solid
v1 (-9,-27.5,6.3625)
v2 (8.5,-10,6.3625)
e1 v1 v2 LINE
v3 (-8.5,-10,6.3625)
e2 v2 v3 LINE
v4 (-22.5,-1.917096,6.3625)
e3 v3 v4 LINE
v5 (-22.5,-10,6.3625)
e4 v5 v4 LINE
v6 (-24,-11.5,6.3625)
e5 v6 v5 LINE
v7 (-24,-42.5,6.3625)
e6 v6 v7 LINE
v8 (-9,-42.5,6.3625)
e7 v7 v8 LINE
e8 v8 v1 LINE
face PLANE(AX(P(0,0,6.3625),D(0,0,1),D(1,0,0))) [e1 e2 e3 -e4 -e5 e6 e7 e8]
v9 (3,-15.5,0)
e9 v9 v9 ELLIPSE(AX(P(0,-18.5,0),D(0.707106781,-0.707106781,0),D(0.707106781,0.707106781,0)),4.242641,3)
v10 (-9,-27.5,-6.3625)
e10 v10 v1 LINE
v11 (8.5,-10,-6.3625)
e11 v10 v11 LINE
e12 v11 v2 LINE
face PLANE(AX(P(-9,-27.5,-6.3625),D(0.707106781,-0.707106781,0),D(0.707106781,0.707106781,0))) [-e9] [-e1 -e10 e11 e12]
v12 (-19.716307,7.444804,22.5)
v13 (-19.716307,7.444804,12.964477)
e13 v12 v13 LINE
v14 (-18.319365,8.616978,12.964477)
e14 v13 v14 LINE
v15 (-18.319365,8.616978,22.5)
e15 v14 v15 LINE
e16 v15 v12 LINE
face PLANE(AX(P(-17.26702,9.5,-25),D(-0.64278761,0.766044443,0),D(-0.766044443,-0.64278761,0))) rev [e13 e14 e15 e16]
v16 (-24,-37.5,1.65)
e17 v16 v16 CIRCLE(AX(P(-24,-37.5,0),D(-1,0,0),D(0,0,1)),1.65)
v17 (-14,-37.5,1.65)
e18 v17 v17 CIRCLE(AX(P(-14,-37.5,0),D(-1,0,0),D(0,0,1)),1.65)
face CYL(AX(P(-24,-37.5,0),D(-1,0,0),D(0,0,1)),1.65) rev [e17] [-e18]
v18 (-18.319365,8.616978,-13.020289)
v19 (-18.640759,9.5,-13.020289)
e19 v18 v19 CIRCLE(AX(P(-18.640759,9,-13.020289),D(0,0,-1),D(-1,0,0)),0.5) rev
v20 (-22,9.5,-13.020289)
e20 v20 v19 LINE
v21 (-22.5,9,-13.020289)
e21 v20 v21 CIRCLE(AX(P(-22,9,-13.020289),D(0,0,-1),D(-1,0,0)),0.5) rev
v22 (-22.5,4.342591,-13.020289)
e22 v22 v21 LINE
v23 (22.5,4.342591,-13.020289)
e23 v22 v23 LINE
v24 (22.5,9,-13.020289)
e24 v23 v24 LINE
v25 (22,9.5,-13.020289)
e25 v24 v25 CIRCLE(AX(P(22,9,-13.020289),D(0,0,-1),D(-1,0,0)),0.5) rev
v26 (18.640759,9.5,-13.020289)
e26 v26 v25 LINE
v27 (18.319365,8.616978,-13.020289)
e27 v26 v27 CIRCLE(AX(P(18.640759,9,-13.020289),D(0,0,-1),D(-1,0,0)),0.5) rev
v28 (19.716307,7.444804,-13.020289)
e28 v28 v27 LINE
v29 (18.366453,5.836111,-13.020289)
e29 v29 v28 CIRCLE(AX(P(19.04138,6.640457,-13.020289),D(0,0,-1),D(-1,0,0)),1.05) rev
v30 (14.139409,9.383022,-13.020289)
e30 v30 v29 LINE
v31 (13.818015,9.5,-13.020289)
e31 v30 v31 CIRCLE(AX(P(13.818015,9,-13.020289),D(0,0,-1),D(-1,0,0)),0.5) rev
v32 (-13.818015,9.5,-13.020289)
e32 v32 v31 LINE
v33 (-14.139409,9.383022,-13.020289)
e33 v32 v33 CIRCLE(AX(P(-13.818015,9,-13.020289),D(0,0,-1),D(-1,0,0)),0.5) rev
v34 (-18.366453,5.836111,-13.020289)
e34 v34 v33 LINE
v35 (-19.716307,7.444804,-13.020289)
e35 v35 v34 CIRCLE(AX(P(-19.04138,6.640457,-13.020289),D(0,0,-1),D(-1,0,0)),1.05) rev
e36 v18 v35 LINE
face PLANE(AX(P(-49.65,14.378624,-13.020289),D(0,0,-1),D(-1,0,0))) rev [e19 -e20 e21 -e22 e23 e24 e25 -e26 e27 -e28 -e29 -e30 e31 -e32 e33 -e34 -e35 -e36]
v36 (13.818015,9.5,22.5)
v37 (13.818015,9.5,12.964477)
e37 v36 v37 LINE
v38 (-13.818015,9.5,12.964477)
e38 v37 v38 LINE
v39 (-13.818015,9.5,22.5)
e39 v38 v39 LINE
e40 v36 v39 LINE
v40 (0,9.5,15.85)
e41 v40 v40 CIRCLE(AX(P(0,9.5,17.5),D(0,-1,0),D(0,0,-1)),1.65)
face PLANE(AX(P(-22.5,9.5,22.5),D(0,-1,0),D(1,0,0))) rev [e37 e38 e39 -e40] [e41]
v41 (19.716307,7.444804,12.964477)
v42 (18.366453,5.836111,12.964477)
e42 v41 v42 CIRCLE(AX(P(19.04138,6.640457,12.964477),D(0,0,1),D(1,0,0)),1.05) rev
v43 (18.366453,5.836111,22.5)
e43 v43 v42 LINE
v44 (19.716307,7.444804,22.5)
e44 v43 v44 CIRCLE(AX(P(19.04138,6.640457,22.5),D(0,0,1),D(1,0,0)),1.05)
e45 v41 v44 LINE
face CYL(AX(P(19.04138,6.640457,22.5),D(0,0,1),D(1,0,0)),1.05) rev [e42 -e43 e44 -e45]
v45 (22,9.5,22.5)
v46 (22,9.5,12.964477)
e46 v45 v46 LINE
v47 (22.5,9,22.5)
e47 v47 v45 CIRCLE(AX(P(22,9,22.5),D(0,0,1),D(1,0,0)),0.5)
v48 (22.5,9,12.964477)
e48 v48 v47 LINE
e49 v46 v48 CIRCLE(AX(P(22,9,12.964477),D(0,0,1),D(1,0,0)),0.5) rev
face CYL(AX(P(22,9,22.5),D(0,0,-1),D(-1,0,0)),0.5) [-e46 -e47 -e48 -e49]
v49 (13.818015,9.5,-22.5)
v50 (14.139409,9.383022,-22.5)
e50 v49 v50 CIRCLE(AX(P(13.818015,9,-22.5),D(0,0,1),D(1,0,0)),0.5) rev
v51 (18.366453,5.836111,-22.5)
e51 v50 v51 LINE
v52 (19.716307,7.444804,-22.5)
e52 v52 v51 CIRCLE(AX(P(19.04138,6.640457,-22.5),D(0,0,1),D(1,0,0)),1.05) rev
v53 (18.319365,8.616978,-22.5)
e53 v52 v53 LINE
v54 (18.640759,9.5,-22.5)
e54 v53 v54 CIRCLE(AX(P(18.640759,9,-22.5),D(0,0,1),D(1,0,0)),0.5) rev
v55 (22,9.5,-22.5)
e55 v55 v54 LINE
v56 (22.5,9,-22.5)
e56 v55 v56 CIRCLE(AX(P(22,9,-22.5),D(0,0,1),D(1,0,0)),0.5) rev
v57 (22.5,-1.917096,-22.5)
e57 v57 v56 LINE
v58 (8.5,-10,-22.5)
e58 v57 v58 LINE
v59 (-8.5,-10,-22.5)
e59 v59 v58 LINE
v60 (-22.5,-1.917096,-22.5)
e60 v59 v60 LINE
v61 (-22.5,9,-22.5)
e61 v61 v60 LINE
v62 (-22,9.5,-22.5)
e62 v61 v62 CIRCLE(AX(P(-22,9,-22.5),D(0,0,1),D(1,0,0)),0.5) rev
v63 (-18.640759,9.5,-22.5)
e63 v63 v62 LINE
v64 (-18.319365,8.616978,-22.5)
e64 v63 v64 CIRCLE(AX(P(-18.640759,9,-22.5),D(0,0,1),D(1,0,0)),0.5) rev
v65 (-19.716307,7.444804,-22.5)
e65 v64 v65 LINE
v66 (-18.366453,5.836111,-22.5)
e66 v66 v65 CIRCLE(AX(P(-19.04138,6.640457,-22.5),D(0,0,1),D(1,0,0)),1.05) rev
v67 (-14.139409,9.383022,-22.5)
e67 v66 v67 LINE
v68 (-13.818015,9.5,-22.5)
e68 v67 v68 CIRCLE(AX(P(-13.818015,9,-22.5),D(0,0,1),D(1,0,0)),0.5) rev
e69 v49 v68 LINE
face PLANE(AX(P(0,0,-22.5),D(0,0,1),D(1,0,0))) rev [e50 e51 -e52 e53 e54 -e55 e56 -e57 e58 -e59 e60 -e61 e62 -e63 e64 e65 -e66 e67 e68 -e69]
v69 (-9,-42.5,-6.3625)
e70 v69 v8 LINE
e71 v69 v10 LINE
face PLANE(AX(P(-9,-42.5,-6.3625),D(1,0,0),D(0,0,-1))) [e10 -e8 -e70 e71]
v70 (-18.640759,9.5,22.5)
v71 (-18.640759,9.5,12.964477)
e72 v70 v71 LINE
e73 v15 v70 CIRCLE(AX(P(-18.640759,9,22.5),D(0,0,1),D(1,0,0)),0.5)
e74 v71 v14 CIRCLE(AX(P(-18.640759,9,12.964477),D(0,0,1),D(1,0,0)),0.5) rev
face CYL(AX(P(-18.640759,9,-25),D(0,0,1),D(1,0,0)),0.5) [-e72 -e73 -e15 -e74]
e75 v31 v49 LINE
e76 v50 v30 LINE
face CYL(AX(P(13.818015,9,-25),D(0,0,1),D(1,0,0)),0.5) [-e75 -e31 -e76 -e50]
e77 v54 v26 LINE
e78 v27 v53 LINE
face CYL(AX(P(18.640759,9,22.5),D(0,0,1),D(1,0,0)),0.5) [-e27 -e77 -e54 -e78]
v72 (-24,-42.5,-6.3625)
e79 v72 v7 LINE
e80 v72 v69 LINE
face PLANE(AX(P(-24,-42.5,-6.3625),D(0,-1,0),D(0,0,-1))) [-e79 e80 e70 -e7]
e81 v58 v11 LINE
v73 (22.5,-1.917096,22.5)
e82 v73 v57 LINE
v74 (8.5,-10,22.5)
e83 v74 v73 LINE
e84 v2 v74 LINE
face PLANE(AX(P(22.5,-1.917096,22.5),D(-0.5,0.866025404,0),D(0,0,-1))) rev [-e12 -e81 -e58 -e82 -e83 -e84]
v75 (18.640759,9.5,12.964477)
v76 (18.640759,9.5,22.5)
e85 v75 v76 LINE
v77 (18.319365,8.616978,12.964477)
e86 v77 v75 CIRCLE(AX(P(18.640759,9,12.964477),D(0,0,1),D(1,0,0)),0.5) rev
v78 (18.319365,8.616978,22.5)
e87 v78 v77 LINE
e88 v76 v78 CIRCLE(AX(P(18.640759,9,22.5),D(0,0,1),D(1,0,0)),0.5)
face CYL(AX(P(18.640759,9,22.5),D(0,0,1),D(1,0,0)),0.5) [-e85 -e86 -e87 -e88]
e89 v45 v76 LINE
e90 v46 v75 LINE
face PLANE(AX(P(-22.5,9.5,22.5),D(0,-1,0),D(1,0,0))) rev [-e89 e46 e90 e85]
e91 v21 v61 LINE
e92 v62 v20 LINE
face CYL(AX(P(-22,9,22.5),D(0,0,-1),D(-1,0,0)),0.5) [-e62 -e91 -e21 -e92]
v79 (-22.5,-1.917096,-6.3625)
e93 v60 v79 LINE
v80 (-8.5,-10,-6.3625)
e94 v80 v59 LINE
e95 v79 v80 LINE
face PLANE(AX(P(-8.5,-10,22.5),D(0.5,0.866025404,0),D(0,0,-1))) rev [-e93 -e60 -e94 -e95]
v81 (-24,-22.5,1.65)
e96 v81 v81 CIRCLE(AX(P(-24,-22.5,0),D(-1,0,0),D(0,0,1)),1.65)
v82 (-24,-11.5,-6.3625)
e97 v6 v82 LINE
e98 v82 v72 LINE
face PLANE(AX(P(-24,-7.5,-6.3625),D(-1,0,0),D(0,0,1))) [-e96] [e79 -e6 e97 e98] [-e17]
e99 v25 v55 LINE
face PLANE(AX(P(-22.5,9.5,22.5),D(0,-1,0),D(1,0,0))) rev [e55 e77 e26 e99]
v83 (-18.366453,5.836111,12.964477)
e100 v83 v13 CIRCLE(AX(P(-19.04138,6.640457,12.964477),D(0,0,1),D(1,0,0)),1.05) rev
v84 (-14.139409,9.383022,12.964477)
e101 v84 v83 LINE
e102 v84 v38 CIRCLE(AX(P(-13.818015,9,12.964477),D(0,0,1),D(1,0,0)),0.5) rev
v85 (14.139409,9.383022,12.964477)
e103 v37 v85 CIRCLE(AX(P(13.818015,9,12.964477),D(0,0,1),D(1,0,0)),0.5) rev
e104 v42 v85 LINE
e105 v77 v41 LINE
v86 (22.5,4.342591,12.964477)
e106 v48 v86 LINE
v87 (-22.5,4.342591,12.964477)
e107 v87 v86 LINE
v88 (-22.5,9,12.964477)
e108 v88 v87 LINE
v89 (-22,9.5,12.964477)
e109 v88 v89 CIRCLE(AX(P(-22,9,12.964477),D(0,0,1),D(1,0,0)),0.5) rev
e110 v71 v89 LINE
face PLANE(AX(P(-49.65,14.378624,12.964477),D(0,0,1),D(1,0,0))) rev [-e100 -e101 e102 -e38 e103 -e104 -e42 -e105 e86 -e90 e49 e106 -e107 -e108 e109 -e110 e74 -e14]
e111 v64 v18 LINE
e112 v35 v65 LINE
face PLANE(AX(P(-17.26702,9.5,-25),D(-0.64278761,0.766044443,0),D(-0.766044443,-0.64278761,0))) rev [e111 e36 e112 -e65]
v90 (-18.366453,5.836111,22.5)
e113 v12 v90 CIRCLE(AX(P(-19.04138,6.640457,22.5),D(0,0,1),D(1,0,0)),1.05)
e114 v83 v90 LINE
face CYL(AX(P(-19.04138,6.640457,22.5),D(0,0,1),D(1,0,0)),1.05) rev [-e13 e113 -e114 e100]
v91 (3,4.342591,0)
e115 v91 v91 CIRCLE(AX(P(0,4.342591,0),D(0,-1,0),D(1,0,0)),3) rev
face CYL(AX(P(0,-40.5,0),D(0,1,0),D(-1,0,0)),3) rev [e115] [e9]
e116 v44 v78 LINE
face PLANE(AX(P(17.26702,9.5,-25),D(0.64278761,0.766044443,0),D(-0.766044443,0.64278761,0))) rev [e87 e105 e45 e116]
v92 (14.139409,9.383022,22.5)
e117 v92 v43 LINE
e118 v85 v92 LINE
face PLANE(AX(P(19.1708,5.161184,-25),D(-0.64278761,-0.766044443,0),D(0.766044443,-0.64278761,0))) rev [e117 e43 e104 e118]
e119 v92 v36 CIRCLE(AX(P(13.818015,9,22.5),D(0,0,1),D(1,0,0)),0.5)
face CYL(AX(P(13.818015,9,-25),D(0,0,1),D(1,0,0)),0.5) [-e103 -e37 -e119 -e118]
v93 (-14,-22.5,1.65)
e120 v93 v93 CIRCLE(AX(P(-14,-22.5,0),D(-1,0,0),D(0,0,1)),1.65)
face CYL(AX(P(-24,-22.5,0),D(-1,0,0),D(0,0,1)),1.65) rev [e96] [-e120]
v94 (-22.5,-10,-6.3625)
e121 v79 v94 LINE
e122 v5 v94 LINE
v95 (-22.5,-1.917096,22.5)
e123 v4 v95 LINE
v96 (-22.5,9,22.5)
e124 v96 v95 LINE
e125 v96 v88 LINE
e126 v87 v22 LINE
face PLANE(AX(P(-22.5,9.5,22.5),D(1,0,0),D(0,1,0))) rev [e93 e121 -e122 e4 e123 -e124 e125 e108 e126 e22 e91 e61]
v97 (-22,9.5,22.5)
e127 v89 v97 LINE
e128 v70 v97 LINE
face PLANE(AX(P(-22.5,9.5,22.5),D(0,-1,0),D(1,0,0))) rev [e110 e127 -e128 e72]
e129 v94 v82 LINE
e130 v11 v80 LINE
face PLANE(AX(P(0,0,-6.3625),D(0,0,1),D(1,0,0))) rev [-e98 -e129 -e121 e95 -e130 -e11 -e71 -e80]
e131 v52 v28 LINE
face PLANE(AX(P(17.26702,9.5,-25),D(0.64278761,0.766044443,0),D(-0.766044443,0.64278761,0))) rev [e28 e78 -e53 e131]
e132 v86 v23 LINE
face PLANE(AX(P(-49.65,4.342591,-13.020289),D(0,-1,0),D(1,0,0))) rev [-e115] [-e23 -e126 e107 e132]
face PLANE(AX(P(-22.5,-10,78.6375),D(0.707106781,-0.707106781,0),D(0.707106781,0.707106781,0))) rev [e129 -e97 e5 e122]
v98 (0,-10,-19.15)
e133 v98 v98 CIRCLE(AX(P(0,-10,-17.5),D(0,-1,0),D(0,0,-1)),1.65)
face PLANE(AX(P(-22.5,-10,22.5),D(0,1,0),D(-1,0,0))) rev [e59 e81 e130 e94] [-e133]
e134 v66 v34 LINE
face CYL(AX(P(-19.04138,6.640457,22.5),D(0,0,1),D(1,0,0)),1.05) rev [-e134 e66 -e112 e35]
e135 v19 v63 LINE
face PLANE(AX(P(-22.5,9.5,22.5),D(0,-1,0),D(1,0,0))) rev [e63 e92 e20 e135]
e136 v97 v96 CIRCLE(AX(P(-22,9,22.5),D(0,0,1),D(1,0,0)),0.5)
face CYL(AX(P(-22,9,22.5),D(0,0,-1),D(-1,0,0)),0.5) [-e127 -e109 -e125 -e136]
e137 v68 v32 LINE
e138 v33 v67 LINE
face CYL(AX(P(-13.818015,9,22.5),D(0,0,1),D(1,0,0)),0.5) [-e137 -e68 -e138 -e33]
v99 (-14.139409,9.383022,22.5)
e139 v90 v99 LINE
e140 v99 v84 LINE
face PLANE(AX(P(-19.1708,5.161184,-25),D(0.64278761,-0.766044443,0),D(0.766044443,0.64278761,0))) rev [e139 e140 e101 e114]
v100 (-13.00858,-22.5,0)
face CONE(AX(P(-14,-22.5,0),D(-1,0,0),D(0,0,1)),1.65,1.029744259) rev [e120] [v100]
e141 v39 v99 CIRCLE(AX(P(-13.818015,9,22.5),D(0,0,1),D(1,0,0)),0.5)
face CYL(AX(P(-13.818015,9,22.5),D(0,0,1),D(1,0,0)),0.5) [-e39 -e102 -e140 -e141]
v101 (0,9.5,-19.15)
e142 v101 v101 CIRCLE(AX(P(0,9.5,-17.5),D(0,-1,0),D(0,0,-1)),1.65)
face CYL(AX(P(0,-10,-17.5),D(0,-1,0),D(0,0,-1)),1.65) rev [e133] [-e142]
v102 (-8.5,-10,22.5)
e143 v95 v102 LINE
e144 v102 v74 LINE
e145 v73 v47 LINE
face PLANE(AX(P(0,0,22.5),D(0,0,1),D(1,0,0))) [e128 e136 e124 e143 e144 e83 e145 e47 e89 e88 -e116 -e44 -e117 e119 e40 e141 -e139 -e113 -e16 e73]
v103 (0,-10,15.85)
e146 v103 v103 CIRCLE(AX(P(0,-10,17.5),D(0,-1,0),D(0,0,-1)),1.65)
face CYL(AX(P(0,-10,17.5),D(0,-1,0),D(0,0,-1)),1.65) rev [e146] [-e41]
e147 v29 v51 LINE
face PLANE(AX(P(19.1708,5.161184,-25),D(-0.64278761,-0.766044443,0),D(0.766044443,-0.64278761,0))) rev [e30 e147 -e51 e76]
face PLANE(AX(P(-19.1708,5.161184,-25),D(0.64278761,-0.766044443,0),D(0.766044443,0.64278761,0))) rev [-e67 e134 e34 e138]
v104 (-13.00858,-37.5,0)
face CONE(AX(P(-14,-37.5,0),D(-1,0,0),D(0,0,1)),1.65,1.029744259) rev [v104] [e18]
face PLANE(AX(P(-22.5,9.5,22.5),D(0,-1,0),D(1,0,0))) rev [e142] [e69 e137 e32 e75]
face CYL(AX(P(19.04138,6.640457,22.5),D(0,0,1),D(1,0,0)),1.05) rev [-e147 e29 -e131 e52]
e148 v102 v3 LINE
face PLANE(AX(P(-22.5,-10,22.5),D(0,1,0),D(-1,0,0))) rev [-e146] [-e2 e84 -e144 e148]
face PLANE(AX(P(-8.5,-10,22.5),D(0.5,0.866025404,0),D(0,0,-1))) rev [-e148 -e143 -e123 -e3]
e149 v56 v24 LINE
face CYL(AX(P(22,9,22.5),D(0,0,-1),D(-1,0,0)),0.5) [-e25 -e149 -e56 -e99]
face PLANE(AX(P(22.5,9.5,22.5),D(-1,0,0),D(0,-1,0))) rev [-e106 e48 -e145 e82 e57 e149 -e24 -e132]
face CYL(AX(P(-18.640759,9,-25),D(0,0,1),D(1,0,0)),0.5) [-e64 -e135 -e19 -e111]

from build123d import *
from OCP.BRepFilletAPI import BRepFilletAPI_MakeChamfer

# Parameters (mm, degrees)
SKETCH1_W                 = 45
SKETCH1_H                 = 19.5
BOSS_EXTRUDE1_DEPTH       = 22.5
M4X0_7_TAPPED_HOLE2_D     = 3.3
BOSS_EXTRUDE3_DEPTH       = 6.3625
M4X0_7_TAPPED_HOLE1_D     = 3.3
M4X0_7_TAPPED_HOLE1_DEPTH = 10
M4X0_7_TAPPED_HOLE1_TIP   = 0.991420021
CUT_EXTRUDE2_DEPTH        = 85
SKETCH2_R                 = 3
CUT_EXTRUDE1_DEPTH        = 50
CUT_EXTRUDE3_DEPTH        = 25
FILLET1_R                 = 1.05
FILLET2_R                 = 1.05
FILLET3_R                 = 0.5
SKETCH12_W                = 25.984765903
SKETCH12_H                = 10.03603234
CUT_EXTRUDE4_DEPTH        = 72.15
CHAMFER1_SIZE             = 14
CHAMFER1_SIZE_2           = 8.082903769


with BuildPart() as part:
    # Sketch1 → Boss-Extrude1 (new, symmetric)
    with BuildSketch(Plane.XY):
        with Locations((0, -0.25)):
            Rectangle(SKETCH1_W, SKETCH1_H)
    extrude(amount=BOSS_EXTRUDE1_DEPTH, both=True)

    # M4x0.7 Tapped Hole2 (through all)
    with Locations(Plane(origin=(0, -10, 0), x_dir=(-1, 0, 0), z_dir=(0, -1, 0))):
        with Locations((0, -17.5), (0, 17.5)):
            Hole(M4X0_7_TAPPED_HOLE2_D / 2)

    # Sketch7 → Boss-Extrude3 (add, symmetric)
    with BuildSketch(Plane.XY):
        Polygon((-22.5, -7.5), (-24, -7.5), (-24, -42.5), (-9, -42.5), (-9, -27.5), (8.5, -10), (-22.5, -10), align=None)
    extrude(amount=BOSS_EXTRUDE3_DEPTH, both=True)

    # M4x0.7 Tapped Hole1
    with Locations(Plane(origin=(-24, 0, 0), x_dir=(0, 0, -1), z_dir=(-1, 0, 0))):
        with Locations((0, 37.5), (0, 22.5)):
            Hole(M4X0_7_TAPPED_HOLE1_D / 2, depth=M4X0_7_TAPPED_HOLE1_DEPTH)
            with Locations((0, 0, -(M4X0_7_TAPPED_HOLE1_DEPTH + M4X0_7_TAPPED_HOLE1_TIP / 2))):  # 118° drill point
                Cone(0, M4X0_7_TAPPED_HOLE1_D / 2, M4X0_7_TAPPED_HOLE1_TIP, mode=Mode.SUBTRACT)

    # Sketch10 → Cut-Extrude2 (cut)
    with BuildSketch(Plane(origin=(0, 0, -6.3625), x_dir=(-1, 0, 0), z_dir=(0, 0, -1))):
        Polygon((22.5, -10), (24, -11.5), (24, -7.5), (22.5, -7.5), align=None)
    extrude(amount=-CUT_EXTRUDE2_DEPTH, mode=Mode.SUBTRACT)

    # Sketch2 → Cut-Extrude1 (cut)
    with BuildSketch(Plane(origin=(0, 9.5, 0), x_dir=(1, 0, 0), z_dir=(0, 1, 0))):
        with Locations(Location((0, 0, 0), (0, 0, 180))):
            Circle(SKETCH2_R)
    extrude(amount=-CUT_EXTRUDE1_DEPTH, mode=Mode.SUBTRACT)

    # Sketch11 → Cut-Extrude3 (cut, symmetric)
    with BuildSketch(Plane.XY):
        Polygon((-17.267020036, 9.5), (-20.520653971, 6.769876965), (-19.170799991, 5.161183635), (-14, 9.5), align=None)
        Polygon((14, 9.5), (17.267020036, 9.5), (20.520653971, 6.769876965), (19.170799991, 5.161183635), align=None)
    extrude(amount=CUT_EXTRUDE3_DEPTH, both=True, mode=Mode.SUBTRACT)

    # Fillet1
    fillet1_edges = [part.edges().sort_by_distance(p)[0] for p in [
        (-19.170799991, 5.161183635, 0),
        (-20.520653971, 6.769876965, 0),
    ]]
    fillet(fillet1_edges, radius=FILLET1_R - 0.0001)  # a hair under: the kernel refuses the full size

    # Fillet2
    fillet2_edges = [part.edges().sort_by_distance(p)[0] for p in [
        (19.170799991, 5.161183635, 0),
        (20.520653971, 6.769876965, 0),
    ]]
    fillet(fillet2_edges, radius=FILLET2_R - 0.0001)  # a hair under: the kernel refuses the full size

    # Fillet3
    fillet3_edges = [part.edges().sort_by_distance(p)[0] for p in [
        (14, 9.5, 0),
        (17.267020036, 9.5, 0),
        (-22.5, 9.5, 0),
        (22.5, 9.5, 0),
        (-17.267020036, 9.5, 0),
        (-14, 9.5, 0),
    ]]
    fillet(fillet3_edges, radius=FILLET3_R)

    # Sketch12 → Cut-Extrude4 (cut)
    with BuildSketch(Plane(origin=(22.5, 0, 0), x_dir=(0, 0, -1), z_dir=(1, 0, 0))):
        with Locations((0.027906174, 9.360607609)):
            Rectangle(SKETCH12_W, SKETCH12_H)
    extrude(amount=-CUT_EXTRUDE4_DEPTH, mode=Mode.SUBTRACT)

    # Chamfer1
    chamfer1_edges_1 = [part.edges().sort_by_distance(p)[0] for p in [
        (-22.5, -10, -14.43125),
    ]]
    chamfer1_side_1 = [part.faces().sort_by_distance(p)[0] for p in [
        (-22.338341925, -10, -14.43125),
    ]]
    chamfer1_edges_2 = [part.edges().sort_by_distance(p)[0] for p in [
        (22.5, -10, 0),
    ]]
    chamfer1_side_2 = [part.faces().sort_by_distance(p)[0] for p in [
        (22.5, -9.838341925, 0),
    ]]
    chamfer1_edges_3 = [part.edges().sort_by_distance(p)[0] for p in [
        (-22.5, -10, 14.43125),
    ]]
    chamfer1_side_3 = [part.faces().sort_by_distance(p)[0] for p in [
        (-22.338341925, -10, 14.43125),
    ]]
    chamfer1 = BRepFilletAPI_MakeChamfer(part.part.solid().wrapped)
    for e in chamfer1_edges_1:
        chamfer1.Add(CHAMFER1_SIZE - 0.0001, CHAMFER1_SIZE_2 - 0.0001, e.wrapped, chamfer1_side_1[0].wrapped)
    for e in chamfer1_edges_2:
        chamfer1.Add(CHAMFER1_SIZE_2 - 0.0001, CHAMFER1_SIZE - 0.0001, e.wrapped, chamfer1_side_2[0].wrapped)
    for e in chamfer1_edges_3:
        chamfer1.Add(CHAMFER1_SIZE - 0.0001, CHAMFER1_SIZE_2 - 0.0001, e.wrapped, chamfer1_side_3[0].wrapped)
    add(Compound.cast(chamfer1.Shape()), mode=Mode.REPLACE)  # a hair under: the kernel refuses the full size


solid = part.part
